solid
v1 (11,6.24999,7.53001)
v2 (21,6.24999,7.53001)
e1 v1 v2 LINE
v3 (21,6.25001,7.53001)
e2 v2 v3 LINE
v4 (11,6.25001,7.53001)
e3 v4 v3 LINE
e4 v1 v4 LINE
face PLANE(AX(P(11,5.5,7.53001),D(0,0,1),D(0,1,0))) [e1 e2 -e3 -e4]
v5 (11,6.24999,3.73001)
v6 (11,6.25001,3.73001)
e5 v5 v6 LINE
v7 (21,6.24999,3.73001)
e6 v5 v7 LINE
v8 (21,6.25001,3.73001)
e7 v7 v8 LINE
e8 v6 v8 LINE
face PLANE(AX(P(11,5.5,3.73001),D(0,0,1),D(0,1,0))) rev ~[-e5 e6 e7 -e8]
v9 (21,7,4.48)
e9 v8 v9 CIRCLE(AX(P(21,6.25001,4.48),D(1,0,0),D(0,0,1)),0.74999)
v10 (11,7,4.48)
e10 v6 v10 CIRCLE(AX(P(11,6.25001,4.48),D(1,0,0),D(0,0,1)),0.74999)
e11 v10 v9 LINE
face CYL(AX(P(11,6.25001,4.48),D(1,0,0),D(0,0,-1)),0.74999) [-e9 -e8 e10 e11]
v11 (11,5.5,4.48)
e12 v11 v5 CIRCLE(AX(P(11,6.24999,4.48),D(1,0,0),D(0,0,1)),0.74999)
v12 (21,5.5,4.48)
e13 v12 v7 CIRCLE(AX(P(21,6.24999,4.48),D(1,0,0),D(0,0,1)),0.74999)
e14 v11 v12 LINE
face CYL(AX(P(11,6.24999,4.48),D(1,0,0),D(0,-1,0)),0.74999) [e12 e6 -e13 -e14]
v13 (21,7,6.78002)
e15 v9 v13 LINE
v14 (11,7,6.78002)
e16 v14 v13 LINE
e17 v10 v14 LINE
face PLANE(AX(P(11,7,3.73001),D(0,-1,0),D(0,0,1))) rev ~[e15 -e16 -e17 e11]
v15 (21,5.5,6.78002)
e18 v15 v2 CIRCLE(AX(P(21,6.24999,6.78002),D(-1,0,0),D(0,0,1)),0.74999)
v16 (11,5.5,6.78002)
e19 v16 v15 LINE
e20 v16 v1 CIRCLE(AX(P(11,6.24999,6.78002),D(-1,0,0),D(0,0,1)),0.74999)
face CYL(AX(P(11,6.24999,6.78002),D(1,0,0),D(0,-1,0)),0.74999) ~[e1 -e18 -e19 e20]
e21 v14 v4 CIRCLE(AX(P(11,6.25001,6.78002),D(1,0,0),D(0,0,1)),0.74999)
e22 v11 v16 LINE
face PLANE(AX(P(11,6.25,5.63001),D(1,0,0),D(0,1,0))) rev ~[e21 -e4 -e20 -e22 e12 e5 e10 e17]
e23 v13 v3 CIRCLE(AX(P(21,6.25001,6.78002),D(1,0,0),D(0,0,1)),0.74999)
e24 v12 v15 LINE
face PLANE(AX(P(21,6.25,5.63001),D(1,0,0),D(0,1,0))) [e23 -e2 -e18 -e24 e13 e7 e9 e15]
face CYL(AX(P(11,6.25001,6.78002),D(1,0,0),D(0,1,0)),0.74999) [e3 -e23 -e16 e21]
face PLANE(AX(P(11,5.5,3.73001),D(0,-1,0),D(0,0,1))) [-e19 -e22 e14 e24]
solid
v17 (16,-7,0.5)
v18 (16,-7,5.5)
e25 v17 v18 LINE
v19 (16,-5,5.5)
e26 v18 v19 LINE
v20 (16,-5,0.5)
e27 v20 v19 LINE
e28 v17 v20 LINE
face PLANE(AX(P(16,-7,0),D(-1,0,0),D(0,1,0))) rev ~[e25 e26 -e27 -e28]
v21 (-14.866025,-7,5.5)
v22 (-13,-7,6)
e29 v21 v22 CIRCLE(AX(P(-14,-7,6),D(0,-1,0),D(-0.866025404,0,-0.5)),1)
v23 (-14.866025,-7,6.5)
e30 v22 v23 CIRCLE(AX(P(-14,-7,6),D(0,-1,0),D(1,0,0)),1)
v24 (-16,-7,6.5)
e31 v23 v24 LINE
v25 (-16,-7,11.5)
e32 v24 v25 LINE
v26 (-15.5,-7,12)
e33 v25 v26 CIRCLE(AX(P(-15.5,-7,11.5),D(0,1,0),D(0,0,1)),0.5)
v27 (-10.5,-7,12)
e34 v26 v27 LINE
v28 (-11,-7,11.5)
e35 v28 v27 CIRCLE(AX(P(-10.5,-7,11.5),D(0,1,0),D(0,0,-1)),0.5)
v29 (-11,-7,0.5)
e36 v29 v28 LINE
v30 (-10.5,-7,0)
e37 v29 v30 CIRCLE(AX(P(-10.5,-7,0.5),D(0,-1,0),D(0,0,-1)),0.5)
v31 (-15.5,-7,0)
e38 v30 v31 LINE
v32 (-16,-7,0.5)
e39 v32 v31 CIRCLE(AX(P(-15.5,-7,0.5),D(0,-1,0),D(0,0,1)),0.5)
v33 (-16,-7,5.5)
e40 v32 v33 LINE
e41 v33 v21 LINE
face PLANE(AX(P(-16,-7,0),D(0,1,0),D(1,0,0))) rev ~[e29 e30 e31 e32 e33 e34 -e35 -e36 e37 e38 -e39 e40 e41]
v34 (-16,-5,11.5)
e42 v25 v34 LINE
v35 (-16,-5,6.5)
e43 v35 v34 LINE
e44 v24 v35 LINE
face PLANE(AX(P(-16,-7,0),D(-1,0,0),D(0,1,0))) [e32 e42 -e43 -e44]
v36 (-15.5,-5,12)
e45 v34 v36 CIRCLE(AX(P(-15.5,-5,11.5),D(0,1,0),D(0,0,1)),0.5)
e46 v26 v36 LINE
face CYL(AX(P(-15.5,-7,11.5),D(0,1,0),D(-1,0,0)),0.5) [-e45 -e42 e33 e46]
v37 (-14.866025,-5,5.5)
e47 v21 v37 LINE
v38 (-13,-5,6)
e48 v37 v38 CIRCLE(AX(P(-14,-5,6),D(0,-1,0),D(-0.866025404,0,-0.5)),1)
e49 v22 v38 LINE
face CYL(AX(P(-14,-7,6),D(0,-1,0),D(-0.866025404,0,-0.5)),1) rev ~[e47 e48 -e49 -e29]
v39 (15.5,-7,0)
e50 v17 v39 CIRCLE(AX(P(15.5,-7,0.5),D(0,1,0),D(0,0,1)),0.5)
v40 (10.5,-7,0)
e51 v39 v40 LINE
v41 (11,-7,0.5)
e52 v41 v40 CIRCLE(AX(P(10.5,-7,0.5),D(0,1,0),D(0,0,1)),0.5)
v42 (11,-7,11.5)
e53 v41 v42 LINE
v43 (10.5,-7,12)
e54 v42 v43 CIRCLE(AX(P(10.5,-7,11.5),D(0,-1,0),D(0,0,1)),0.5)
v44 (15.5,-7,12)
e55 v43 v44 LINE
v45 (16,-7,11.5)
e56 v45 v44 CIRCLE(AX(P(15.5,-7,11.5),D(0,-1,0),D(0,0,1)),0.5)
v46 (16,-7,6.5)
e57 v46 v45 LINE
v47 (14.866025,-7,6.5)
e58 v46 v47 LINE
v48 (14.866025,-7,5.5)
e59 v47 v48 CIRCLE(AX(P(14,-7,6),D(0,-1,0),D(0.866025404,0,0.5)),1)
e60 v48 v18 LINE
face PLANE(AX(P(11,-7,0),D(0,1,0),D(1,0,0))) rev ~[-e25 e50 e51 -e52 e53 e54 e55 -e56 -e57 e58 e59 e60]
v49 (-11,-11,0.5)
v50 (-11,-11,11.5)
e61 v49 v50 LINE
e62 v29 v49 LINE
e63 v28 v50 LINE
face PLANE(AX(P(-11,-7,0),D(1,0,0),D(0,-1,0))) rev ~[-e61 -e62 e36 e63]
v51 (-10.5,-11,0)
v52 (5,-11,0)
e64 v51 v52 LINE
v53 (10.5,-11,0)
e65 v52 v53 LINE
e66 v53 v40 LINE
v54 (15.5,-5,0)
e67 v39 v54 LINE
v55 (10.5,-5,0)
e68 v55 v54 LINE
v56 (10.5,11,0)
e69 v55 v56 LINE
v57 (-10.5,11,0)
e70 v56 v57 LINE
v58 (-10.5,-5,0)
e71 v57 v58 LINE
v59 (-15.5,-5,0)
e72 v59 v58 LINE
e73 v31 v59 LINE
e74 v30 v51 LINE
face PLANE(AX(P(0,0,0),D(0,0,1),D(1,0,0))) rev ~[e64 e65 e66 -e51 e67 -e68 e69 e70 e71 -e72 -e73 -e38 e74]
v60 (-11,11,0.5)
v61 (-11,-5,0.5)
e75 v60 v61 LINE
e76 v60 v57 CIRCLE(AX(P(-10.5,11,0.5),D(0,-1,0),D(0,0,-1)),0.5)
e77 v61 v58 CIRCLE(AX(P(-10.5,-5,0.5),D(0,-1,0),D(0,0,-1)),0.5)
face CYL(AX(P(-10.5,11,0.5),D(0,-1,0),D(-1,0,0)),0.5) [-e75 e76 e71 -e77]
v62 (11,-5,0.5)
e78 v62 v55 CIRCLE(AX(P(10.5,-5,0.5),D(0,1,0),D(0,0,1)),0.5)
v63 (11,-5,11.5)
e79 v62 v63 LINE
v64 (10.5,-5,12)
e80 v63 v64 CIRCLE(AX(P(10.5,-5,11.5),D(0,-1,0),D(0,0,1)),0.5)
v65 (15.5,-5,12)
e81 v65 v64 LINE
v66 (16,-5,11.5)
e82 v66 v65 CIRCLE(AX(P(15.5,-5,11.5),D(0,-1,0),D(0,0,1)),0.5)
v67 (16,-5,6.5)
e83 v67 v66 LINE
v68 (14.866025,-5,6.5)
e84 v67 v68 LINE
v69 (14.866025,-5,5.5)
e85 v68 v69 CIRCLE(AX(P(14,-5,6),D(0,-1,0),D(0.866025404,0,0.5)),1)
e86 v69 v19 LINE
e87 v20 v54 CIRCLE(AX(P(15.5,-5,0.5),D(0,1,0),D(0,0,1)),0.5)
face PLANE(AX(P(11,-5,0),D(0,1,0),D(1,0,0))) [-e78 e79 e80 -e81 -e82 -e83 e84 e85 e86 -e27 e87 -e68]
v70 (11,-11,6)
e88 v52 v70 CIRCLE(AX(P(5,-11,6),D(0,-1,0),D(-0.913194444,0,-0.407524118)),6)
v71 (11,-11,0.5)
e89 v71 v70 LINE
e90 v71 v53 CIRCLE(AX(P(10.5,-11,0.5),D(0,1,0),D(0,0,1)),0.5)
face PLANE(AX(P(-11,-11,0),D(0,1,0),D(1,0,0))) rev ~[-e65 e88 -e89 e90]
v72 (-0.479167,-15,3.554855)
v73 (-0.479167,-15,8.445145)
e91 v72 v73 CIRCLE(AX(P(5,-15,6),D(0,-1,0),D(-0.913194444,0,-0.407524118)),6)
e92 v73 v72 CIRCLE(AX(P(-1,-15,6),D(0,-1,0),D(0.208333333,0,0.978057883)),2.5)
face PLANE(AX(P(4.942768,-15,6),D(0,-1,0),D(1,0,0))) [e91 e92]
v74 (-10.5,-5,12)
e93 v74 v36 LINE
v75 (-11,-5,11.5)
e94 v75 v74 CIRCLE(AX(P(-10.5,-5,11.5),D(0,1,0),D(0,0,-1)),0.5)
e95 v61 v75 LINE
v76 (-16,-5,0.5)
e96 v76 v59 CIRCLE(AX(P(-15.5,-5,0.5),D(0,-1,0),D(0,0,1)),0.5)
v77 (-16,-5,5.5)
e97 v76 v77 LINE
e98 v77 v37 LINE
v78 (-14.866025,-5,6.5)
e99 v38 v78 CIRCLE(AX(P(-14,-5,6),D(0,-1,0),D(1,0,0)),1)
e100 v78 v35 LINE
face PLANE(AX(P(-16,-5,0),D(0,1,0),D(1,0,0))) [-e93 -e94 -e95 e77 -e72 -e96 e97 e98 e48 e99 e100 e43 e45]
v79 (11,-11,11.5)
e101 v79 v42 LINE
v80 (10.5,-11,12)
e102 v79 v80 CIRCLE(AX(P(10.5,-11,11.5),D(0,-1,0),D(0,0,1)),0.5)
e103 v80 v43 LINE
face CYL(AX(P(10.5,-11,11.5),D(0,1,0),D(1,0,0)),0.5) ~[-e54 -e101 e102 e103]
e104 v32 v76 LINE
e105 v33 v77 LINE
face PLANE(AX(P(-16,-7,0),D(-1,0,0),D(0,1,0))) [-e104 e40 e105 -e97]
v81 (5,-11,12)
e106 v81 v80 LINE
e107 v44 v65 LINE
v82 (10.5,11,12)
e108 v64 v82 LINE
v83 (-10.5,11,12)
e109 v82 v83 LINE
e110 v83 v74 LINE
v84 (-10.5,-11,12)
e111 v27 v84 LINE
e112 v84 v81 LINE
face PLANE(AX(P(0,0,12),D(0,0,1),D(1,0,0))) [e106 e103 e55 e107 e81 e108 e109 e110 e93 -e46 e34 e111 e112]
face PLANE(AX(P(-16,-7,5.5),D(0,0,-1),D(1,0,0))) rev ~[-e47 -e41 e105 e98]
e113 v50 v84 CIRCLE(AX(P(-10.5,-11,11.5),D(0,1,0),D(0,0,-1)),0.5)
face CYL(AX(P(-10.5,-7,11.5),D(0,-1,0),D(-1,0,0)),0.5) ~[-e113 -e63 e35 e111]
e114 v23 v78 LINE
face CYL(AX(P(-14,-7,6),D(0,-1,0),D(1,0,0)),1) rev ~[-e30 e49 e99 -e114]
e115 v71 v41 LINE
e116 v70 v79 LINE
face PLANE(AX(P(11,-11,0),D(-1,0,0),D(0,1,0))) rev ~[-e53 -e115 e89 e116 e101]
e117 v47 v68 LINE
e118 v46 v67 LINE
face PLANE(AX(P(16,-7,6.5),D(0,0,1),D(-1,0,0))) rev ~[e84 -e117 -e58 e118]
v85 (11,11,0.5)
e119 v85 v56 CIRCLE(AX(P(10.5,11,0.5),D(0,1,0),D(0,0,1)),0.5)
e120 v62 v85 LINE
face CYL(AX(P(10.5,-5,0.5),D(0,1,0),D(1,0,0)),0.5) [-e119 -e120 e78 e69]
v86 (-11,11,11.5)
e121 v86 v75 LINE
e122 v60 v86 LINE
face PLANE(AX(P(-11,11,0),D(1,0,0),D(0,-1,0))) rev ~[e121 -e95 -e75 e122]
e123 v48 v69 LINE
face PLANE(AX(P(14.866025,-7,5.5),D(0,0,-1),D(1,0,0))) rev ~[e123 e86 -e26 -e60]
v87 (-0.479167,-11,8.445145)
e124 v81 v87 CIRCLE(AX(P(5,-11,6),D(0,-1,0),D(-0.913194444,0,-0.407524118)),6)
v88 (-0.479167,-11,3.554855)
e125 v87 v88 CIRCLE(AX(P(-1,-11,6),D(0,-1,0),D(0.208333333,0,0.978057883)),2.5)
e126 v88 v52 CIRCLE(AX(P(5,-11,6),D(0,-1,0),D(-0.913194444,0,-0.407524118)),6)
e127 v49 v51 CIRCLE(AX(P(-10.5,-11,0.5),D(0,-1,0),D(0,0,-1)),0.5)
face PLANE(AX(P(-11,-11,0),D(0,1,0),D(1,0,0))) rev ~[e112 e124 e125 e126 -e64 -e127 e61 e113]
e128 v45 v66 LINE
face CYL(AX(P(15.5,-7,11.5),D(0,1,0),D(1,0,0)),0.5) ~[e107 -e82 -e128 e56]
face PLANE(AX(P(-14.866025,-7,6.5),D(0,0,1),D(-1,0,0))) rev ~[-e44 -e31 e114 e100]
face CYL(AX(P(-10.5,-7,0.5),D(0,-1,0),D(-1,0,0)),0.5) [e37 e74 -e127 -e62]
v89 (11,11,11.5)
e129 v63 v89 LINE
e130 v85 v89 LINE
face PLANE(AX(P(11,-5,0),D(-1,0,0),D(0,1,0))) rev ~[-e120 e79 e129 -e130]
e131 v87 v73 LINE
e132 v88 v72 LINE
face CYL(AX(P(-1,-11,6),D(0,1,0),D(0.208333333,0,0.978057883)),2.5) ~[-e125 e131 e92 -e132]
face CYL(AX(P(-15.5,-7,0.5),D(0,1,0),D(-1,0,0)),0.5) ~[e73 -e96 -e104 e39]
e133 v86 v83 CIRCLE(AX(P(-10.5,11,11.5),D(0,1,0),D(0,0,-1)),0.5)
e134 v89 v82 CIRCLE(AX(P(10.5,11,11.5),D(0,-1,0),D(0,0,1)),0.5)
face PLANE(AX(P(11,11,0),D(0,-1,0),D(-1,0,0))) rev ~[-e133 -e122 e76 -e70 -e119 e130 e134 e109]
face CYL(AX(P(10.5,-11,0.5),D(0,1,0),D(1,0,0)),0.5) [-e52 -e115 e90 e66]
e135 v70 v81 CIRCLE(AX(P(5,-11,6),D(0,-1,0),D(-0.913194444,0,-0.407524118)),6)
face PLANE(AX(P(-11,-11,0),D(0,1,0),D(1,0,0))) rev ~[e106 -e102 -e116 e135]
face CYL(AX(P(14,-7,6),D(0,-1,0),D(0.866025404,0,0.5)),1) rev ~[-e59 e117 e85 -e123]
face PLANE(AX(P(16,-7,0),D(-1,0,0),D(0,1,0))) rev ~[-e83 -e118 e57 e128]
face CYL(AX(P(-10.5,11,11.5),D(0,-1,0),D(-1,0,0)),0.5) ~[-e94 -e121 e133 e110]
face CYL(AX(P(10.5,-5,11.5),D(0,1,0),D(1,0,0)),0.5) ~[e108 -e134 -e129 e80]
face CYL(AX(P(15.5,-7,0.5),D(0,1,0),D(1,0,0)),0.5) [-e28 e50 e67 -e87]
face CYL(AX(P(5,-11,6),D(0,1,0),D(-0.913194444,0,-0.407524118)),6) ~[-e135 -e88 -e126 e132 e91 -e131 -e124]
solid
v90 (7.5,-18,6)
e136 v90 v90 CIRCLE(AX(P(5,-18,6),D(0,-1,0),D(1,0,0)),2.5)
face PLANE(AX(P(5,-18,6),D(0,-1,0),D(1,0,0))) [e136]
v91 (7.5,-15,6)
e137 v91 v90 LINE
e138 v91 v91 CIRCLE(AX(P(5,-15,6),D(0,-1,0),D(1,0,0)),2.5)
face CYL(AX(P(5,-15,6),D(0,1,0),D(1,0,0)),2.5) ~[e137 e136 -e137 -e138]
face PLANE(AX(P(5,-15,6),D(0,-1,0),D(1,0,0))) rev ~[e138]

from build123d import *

# Parameters (mm, degrees)
F0_W      = 5
F0_H      = 2
F1_DEPTH  = 12
F2_R      = 0.5
F4_DEPTH  = 4
F5_R      = 2.5
F6_DEPTH  = 3
F7_W      = 1.5
F7_H      = 3.8
F8_DEPTH  = 10
F9_R      = 0.74999
F11_DEPTH = 2


# Not quite as in the source:
# - a fillet or chamfer is up to 0.001 mm smaller than in the source, because OpenCascade refuses the exact size


with BuildPart() as f1:
    # F0 (on Top) → F1 (new body)
    with BuildSketch(Plane.XY):
        Polygon((-11, -11), (11, -11), (11, -7), (11, -5), (11, 11), (-11, 11), (-11, -5), (-11, -7), align=None)
        with Locations((13.5, -6)):
            Rectangle(F0_W, F0_H)
        with Locations((-13.5, -6)):
            Rectangle(F0_W, F0_H)
    extrude(amount=F1_DEPTH)

    # F2
    f2_edges = [f1.edges().sort_by_distance(p)[0] for p in [
        (11, 3, 12),
        (11, -9, 12),
        (-11, -9, 12),
        (16, -6, 12),
        (-11, 3, 12),
        (-16, -6, 12),
        (-11, 3, 0),
        (-11, -9, 0),
        (-16, -6, 0),
        (11, -9, 0),
        (11, 3, 0),
        (16, -6, 0),
    ]]
    fillet(f2_edges, radius=F2_R)

    # F3 (on face) → F4 (join)
    with BuildSketch(Plane.XZ.offset(11)):
        with BuildLine():
            ThreePointArc((-0.4791666667, 3.5548552929), (6.25, 0.1316527028), (11, 6))
            ThreePointArc((11, 6), (6.25, 11.8683472972), (-0.4791666667, 8.4451447071))
            ThreePointArc((-0.4791666667, 8.4451447071), (0.9432039694, 7.572882174), (1.5, 6))
            ThreePointArc((1.5, 6), (0.9432039694, 4.427117826), (-0.4791666667, 3.5548552929))
        make_face()
        with BuildLine():
            ThreePointArc((1.5, 6), (0.9432039694, 7.572882174), (-0.4791666667, 8.4451447071))
            ThreePointArc((-0.4791666667, 8.4451447071), (-1, 6), (-0.4791666667, 3.5548552929))
            ThreePointArc((-0.4791666667, 3.5548552929), (0.9432039694, 4.427117826), (1.5, 6))
        make_face()
        with BuildLine():
            ThreePointArc((-0.4791666667, 3.5548552929), (-1, 6), (-0.4791666667, 8.4451447071))
            ThreePointArc((-0.4791666667, 8.4451447071), (-3.5, 6), (-0.4791666667, 3.5548552929))
        make_face()
    extrude(amount=F4_DEPTH)

    # F10 (on face) → F11 (cut, through all)
    with BuildSketch(Plane.XZ.offset(7)):
        with BuildLine():
            ThreePointArc((14.8660254038, 5.5), (14.9659258263, 5.7411809549), (15, 6))
            ThreePointArc((15, 6), (14.9659258263, 6.2588190451), (14.8660254038, 6.5))
            Line((14.8660254038, 6.5), (14, 6.5))
            Line((14, 6.5), (14, 5.5))
            Line((14, 5.5), (14.8660254038, 5.5))
        make_face()
        with BuildLine():
            Line((14, 6.5), (14.8660254038, 6.5))
            ThreePointArc((14.8660254038, 6.5), (13, 6), (14.8660254038, 5.5))
            Line((14.8660254038, 5.5), (14, 5.5))
            Line((14, 5.5), (14, 6.5))
        make_face()
        with BuildLine():
            ThreePointArc((14.8660254038, 6.5), (14.9659258263, 6.2588190451), (15, 6))
            ThreePointArc((15, 6), (14.9659258263, 5.7411809549), (14.8660254038, 5.5))
            Line((14.8660254038, 5.5), (16, 5.5))
            Line((16, 5.5), (16, 6.5))
            Line((16, 6.5), (14.8660254038, 6.5))
        make_face()
        with BuildLine():
            Line((-14.8660254038, 6.5), (-14, 6.5))
            Line((-14, 6.5), (-14, 5.5))
            Line((-14, 5.5), (-14.8660254038, 5.5))
            ThreePointArc((-14.8660254038, 5.5), (-13.7411809549, 5.0340741737), (-13, 6))
            ThreePointArc((-13, 6), (-13.7411809549, 6.9659258263), (-14.8660254038, 6.5))
        make_face()
        with BuildLine():
            ThreePointArc((-14.8660254038, 5.5), (-15, 6), (-14.8660254038, 6.5))
            Line((-14.8660254038, 6.5), (-16, 6.5))
            Line((-16, 6.5), (-16, 5.5))
            Line((-16, 5.5), (-14.8660254038, 5.5))
        make_face()
        with BuildLine():
            Line((-14, 5.5), (-14, 6.5))
            Line((-14, 6.5), (-14.8660254038, 6.5))
            ThreePointArc((-14.8660254038, 6.5), (-15, 6), (-14.8660254038, 5.5))
            Line((-14.8660254038, 5.5), (-14, 5.5))
        make_face()
    extrude(amount=-F11_DEPTH, mode=Mode.SUBTRACT)


with BuildPart() as f6:
    # F5 (on face) → F6 (new body)
    with BuildSketch(Plane.XZ.offset(15)):
        with Locations((5, 6)):
            Circle(F5_R)
    extrude(amount=F6_DEPTH)


with BuildPart() as f8:
    # F7 (on face) → F8 (new body)
    with BuildSketch(Plane.YZ.offset(11)):
        with Locations((6.25, 5.6300098076)):
            Rectangle(F7_W, F7_H)
    extrude(amount=F8_DEPTH)

    # F9 (radius 0.75 in the source; OpenCascade refuses exactly that, so slightly less here)
    f9_edges = [f8.edges().sort_by_distance(p)[0] for p in [
        (16, 5.5, 7.53001),
        (16, 7, 7.53001),
        (16, 5.5, 3.73001),
        (16, 7, 3.73001),
    ]]
    fillet(f9_edges, radius=F9_R)


solid = Compound([f1.part, f6.part, f8.part])
